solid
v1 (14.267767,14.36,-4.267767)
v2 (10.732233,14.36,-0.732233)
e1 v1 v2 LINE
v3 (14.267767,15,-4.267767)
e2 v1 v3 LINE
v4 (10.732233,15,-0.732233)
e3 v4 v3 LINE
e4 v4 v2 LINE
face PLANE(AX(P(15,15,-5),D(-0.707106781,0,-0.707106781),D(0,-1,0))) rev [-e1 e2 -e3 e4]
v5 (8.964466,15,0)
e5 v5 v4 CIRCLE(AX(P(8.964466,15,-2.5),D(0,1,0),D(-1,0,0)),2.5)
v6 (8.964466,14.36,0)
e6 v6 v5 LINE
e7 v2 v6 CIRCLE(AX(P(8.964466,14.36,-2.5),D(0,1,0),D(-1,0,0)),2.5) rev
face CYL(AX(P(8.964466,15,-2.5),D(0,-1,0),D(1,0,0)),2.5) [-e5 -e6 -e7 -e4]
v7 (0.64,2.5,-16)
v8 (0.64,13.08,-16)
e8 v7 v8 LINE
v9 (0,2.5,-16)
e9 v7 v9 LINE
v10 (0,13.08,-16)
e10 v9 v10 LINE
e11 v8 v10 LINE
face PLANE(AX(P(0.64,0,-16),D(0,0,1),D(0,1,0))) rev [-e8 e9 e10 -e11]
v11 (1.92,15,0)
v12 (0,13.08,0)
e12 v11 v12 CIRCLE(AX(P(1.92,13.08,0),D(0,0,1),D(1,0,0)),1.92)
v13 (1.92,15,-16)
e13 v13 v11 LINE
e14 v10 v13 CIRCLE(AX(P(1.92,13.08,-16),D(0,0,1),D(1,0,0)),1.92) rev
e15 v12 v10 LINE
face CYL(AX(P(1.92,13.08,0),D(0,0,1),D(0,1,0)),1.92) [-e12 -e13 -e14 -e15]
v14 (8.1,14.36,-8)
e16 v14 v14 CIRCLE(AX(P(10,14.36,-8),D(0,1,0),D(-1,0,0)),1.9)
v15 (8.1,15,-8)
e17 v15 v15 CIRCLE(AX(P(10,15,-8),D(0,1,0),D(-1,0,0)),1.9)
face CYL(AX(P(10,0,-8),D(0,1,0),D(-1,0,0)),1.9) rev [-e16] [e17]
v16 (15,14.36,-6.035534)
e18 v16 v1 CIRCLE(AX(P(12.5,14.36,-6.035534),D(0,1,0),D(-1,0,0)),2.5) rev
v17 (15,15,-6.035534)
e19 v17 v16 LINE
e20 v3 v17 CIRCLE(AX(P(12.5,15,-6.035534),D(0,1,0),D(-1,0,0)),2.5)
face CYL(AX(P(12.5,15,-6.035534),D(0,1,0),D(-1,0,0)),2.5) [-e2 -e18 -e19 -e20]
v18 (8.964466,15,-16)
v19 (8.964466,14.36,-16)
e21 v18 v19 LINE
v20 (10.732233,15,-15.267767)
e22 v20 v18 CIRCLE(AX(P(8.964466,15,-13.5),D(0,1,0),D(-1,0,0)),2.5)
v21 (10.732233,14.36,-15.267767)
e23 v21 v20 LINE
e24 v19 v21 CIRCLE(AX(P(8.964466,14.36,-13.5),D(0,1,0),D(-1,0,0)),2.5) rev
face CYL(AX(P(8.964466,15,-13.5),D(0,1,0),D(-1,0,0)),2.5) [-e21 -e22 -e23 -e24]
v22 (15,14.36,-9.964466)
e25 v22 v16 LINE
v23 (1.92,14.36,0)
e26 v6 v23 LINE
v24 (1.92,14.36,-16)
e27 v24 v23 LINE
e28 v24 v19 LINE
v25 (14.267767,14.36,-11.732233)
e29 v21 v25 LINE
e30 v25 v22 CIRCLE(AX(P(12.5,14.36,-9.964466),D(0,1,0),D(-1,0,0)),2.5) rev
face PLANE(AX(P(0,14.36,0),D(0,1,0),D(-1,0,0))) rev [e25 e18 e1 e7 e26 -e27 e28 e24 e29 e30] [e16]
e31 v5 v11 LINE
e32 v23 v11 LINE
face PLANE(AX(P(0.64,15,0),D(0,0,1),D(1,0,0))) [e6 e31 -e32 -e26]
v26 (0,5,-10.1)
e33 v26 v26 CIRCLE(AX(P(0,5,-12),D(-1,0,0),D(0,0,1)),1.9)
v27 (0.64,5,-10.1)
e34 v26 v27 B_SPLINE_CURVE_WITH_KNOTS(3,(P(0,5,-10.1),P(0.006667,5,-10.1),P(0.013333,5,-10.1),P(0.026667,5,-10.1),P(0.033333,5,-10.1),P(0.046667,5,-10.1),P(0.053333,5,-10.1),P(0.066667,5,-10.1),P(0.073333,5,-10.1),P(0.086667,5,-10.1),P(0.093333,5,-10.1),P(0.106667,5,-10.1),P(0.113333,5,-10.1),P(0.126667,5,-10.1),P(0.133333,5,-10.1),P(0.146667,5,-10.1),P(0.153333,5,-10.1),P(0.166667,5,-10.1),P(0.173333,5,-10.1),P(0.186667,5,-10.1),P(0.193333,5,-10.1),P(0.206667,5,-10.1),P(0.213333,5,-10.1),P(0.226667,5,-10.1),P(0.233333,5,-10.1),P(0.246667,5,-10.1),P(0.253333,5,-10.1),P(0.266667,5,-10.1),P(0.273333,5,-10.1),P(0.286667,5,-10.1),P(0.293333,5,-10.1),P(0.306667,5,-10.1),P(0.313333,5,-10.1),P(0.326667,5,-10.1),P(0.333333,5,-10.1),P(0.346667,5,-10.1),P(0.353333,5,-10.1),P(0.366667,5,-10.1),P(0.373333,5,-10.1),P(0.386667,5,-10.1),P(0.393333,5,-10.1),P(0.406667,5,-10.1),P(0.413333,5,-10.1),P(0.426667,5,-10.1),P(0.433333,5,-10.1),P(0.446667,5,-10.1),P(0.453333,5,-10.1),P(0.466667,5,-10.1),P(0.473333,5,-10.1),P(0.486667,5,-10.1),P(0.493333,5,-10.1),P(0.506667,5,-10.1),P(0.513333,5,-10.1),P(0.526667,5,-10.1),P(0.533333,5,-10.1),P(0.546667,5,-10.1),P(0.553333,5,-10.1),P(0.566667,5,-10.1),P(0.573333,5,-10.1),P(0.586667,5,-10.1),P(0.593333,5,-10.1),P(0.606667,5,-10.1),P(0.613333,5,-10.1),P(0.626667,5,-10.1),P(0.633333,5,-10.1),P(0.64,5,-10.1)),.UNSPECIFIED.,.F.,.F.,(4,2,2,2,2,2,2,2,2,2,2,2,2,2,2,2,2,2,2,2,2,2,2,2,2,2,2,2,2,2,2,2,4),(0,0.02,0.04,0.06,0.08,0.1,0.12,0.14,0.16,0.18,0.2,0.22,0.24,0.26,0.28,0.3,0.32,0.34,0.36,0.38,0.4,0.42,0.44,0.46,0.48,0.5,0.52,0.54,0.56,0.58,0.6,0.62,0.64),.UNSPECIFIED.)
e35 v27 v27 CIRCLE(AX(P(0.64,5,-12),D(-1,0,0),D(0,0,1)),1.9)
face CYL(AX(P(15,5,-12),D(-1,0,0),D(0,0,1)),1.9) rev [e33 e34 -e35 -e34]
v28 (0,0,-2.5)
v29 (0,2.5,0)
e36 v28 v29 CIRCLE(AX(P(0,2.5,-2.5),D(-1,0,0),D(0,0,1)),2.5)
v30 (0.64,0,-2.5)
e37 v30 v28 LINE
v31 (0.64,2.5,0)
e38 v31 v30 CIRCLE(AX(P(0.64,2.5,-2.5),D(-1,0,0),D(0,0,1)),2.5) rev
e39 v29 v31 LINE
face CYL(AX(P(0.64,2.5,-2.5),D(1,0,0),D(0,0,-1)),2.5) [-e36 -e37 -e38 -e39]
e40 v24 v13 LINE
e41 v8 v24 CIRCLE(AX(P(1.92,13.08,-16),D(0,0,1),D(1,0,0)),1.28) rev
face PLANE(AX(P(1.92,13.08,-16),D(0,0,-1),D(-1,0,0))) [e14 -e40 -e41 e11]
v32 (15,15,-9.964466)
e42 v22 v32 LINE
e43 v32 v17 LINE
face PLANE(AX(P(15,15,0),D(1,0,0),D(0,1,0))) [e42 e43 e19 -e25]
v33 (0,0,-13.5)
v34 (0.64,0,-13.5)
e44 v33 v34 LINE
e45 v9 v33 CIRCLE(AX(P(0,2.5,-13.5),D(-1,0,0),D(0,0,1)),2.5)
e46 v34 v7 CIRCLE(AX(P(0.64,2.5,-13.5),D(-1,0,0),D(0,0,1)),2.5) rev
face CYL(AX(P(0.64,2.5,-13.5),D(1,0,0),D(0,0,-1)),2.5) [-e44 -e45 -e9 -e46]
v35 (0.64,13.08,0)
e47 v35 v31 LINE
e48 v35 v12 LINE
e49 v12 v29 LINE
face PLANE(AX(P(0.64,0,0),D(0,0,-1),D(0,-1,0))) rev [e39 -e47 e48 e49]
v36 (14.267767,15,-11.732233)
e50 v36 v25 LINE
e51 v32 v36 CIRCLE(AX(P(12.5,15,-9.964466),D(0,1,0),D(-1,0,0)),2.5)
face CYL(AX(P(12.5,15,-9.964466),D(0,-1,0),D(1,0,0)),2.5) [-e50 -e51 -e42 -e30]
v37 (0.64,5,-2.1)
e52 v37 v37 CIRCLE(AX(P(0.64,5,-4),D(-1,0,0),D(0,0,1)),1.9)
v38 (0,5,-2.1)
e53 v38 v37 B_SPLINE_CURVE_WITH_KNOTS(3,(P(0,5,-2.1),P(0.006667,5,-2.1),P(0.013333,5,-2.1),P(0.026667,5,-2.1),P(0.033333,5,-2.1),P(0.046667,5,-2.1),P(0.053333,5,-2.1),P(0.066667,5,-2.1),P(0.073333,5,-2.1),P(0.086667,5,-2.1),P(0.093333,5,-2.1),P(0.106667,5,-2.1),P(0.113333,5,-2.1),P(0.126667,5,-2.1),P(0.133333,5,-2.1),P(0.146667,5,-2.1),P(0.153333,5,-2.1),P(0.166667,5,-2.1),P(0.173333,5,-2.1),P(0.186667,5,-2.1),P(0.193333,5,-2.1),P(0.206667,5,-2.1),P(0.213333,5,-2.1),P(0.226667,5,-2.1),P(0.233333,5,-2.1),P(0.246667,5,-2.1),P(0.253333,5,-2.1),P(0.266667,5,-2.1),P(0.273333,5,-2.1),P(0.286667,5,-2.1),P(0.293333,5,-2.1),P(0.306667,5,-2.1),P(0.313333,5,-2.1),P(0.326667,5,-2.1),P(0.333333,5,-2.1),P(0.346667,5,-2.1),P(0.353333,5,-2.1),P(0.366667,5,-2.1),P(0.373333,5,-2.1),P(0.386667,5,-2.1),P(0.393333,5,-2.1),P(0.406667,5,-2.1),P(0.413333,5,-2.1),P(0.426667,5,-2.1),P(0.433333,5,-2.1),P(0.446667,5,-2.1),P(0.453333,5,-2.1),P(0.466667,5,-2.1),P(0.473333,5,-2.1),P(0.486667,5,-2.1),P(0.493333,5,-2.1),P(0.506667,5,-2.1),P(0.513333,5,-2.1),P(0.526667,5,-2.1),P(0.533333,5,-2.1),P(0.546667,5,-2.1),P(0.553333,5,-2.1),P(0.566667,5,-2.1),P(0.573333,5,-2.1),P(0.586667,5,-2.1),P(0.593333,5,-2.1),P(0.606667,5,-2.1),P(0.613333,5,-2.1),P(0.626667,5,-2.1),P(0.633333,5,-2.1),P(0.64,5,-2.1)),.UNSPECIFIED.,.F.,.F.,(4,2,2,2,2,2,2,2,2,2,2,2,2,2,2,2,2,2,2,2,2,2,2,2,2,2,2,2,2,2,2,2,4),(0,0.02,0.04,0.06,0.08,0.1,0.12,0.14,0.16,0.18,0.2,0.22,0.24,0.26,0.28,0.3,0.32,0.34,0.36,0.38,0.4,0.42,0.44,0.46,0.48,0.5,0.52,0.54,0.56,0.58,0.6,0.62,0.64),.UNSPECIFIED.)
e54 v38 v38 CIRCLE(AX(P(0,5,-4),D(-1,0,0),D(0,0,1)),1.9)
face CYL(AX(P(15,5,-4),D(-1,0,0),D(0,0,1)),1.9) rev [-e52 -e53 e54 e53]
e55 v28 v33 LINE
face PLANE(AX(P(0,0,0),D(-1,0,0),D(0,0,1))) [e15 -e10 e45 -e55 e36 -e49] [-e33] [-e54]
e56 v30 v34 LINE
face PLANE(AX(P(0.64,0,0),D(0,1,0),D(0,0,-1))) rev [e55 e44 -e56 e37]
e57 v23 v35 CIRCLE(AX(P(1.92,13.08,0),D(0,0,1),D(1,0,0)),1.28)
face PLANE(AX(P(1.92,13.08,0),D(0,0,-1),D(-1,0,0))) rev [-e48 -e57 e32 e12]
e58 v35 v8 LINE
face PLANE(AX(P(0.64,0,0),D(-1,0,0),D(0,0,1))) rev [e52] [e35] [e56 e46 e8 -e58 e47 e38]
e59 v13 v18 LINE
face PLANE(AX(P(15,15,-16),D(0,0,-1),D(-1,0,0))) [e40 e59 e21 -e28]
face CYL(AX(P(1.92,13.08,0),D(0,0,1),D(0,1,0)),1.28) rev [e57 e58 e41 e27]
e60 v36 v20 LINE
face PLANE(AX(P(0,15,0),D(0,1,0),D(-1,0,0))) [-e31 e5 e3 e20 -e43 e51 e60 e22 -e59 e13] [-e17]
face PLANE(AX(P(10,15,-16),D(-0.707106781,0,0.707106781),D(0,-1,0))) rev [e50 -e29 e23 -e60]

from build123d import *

# Parameters (mm, degrees)
SKETCH1_W                    = 16
SKETCH1_H                    = 15
BOSS_EXTRUDE1_DEPTH          = 0.64
EDGE_FLANGE1_STRIP_W         = 5.12
EDGE_FLANGE1_STRIP_H         = 0.64
EDGE_FLANGE1_STRIP_CUT_DEPTH = 16
EDGE_FLANGE1_DEPTH           = 16
SKETCH9_R                    = 1.9
CUT_EXTRUDE1_DEPTH           = 27.570660511
SKETCH10_R                   = 1.9
CUT_EXTRUDE2_DEPTH           = 27.570660511
CHAMFER1_SIZE                = 5
FILLET1_R                    = 2.5


# Sheet-metal steps are written as plain solids
with BuildPart() as part:
    # Sketch1 → Boss-Extrude1 (new body)
    with BuildSketch(Plane(origin=(0, 0, 0), x_dir=(0, 0, -1), z_dir=(1, 0, 0))):
        with Locations((8, 7.5)):
            Rectangle(SKETCH1_W, SKETCH1_H)
    extrude(amount=BOSS_EXTRUDE1_DEPTH)

    # Edge-Flange1 strip (across the edge) → Edge-Flange1 strip cut (cut)
    with BuildSketch(Plane(origin=(0.64, 15, -16), x_dir=(0, -1, 0), z_dir=(0, 0, 1))):
        with Locations((-0.64, -0.32)):
            Rectangle(EDGE_FLANGE1_STRIP_W, EDGE_FLANGE1_STRIP_H)
    extrude(amount=EDGE_FLANGE1_STRIP_CUT_DEPTH, mode=Mode.SUBTRACT)

    # Edge-Flange1 section (across the edge) → Edge-Flange1 (add)
    with BuildSketch(Plane(origin=(0.64, 15, -16), x_dir=(0, -1, 0), z_dir=(0, 0, 1))):
        with BuildLine():
            Line((0, 1.28), (0, 14.36))
            Line((0, 14.36), (0.64, 14.36))
            Line((0.64, 14.36), (0.64, 1.28))
            ThreePointArc((0.64, 1.28), (1.01490332, 0.37490332), (1.92, 0))
            Line((1.92, 0), (1.92, -0.64))
            ThreePointArc((1.92, -0.64), (0.56235498, -0.07764502), (0, 1.28))
        make_face()
    extrude(amount=EDGE_FLANGE1_DEPTH)

    # Sketch9 → Cut-Extrude1 (cut, through all)
    with BuildSketch(Plane.ZY):
        with Locations((-12, 5)):
            Circle(SKETCH9_R)
        with Locations((-4, 5)):
            Circle(SKETCH9_R)
    extrude(amount=-CUT_EXTRUDE1_DEPTH, mode=Mode.SUBTRACT)

    # Sketch10 → Cut-Extrude2 (cut, through all)
    with BuildSketch(Plane(origin=(0, 15, 0), x_dir=(1, 0, 0), z_dir=(0, 1, 0))):
        with Locations(Location((10, 8, 0), (0, 0, 180))):
            Circle(SKETCH10_R)
    extrude(amount=-CUT_EXTRUDE2_DEPTH, mode=Mode.SUBTRACT)

    # Chamfer1
    chamfer1_edges = [part.edges().sort_by_distance(p)[0] for p in [
        (15, 14.68, -16),
        (15, 14.68, 0),
    ]]
    chamfer(chamfer1_edges, length=CHAMFER1_SIZE)

    # Fillet1
    fillet1_edges = [part.edges().sort_by_distance(p)[0] for p in [
        (10, 14.68, -16),
        (15, 14.68, -5),
        (15, 14.68, -11),
        (10, 14.68, 0),
        (0.32, 0, 0),
        (0.32, 0, -16),
    ]]
    fillet(fillet1_edges, radius=FILLET1_R)


solid = part.part
